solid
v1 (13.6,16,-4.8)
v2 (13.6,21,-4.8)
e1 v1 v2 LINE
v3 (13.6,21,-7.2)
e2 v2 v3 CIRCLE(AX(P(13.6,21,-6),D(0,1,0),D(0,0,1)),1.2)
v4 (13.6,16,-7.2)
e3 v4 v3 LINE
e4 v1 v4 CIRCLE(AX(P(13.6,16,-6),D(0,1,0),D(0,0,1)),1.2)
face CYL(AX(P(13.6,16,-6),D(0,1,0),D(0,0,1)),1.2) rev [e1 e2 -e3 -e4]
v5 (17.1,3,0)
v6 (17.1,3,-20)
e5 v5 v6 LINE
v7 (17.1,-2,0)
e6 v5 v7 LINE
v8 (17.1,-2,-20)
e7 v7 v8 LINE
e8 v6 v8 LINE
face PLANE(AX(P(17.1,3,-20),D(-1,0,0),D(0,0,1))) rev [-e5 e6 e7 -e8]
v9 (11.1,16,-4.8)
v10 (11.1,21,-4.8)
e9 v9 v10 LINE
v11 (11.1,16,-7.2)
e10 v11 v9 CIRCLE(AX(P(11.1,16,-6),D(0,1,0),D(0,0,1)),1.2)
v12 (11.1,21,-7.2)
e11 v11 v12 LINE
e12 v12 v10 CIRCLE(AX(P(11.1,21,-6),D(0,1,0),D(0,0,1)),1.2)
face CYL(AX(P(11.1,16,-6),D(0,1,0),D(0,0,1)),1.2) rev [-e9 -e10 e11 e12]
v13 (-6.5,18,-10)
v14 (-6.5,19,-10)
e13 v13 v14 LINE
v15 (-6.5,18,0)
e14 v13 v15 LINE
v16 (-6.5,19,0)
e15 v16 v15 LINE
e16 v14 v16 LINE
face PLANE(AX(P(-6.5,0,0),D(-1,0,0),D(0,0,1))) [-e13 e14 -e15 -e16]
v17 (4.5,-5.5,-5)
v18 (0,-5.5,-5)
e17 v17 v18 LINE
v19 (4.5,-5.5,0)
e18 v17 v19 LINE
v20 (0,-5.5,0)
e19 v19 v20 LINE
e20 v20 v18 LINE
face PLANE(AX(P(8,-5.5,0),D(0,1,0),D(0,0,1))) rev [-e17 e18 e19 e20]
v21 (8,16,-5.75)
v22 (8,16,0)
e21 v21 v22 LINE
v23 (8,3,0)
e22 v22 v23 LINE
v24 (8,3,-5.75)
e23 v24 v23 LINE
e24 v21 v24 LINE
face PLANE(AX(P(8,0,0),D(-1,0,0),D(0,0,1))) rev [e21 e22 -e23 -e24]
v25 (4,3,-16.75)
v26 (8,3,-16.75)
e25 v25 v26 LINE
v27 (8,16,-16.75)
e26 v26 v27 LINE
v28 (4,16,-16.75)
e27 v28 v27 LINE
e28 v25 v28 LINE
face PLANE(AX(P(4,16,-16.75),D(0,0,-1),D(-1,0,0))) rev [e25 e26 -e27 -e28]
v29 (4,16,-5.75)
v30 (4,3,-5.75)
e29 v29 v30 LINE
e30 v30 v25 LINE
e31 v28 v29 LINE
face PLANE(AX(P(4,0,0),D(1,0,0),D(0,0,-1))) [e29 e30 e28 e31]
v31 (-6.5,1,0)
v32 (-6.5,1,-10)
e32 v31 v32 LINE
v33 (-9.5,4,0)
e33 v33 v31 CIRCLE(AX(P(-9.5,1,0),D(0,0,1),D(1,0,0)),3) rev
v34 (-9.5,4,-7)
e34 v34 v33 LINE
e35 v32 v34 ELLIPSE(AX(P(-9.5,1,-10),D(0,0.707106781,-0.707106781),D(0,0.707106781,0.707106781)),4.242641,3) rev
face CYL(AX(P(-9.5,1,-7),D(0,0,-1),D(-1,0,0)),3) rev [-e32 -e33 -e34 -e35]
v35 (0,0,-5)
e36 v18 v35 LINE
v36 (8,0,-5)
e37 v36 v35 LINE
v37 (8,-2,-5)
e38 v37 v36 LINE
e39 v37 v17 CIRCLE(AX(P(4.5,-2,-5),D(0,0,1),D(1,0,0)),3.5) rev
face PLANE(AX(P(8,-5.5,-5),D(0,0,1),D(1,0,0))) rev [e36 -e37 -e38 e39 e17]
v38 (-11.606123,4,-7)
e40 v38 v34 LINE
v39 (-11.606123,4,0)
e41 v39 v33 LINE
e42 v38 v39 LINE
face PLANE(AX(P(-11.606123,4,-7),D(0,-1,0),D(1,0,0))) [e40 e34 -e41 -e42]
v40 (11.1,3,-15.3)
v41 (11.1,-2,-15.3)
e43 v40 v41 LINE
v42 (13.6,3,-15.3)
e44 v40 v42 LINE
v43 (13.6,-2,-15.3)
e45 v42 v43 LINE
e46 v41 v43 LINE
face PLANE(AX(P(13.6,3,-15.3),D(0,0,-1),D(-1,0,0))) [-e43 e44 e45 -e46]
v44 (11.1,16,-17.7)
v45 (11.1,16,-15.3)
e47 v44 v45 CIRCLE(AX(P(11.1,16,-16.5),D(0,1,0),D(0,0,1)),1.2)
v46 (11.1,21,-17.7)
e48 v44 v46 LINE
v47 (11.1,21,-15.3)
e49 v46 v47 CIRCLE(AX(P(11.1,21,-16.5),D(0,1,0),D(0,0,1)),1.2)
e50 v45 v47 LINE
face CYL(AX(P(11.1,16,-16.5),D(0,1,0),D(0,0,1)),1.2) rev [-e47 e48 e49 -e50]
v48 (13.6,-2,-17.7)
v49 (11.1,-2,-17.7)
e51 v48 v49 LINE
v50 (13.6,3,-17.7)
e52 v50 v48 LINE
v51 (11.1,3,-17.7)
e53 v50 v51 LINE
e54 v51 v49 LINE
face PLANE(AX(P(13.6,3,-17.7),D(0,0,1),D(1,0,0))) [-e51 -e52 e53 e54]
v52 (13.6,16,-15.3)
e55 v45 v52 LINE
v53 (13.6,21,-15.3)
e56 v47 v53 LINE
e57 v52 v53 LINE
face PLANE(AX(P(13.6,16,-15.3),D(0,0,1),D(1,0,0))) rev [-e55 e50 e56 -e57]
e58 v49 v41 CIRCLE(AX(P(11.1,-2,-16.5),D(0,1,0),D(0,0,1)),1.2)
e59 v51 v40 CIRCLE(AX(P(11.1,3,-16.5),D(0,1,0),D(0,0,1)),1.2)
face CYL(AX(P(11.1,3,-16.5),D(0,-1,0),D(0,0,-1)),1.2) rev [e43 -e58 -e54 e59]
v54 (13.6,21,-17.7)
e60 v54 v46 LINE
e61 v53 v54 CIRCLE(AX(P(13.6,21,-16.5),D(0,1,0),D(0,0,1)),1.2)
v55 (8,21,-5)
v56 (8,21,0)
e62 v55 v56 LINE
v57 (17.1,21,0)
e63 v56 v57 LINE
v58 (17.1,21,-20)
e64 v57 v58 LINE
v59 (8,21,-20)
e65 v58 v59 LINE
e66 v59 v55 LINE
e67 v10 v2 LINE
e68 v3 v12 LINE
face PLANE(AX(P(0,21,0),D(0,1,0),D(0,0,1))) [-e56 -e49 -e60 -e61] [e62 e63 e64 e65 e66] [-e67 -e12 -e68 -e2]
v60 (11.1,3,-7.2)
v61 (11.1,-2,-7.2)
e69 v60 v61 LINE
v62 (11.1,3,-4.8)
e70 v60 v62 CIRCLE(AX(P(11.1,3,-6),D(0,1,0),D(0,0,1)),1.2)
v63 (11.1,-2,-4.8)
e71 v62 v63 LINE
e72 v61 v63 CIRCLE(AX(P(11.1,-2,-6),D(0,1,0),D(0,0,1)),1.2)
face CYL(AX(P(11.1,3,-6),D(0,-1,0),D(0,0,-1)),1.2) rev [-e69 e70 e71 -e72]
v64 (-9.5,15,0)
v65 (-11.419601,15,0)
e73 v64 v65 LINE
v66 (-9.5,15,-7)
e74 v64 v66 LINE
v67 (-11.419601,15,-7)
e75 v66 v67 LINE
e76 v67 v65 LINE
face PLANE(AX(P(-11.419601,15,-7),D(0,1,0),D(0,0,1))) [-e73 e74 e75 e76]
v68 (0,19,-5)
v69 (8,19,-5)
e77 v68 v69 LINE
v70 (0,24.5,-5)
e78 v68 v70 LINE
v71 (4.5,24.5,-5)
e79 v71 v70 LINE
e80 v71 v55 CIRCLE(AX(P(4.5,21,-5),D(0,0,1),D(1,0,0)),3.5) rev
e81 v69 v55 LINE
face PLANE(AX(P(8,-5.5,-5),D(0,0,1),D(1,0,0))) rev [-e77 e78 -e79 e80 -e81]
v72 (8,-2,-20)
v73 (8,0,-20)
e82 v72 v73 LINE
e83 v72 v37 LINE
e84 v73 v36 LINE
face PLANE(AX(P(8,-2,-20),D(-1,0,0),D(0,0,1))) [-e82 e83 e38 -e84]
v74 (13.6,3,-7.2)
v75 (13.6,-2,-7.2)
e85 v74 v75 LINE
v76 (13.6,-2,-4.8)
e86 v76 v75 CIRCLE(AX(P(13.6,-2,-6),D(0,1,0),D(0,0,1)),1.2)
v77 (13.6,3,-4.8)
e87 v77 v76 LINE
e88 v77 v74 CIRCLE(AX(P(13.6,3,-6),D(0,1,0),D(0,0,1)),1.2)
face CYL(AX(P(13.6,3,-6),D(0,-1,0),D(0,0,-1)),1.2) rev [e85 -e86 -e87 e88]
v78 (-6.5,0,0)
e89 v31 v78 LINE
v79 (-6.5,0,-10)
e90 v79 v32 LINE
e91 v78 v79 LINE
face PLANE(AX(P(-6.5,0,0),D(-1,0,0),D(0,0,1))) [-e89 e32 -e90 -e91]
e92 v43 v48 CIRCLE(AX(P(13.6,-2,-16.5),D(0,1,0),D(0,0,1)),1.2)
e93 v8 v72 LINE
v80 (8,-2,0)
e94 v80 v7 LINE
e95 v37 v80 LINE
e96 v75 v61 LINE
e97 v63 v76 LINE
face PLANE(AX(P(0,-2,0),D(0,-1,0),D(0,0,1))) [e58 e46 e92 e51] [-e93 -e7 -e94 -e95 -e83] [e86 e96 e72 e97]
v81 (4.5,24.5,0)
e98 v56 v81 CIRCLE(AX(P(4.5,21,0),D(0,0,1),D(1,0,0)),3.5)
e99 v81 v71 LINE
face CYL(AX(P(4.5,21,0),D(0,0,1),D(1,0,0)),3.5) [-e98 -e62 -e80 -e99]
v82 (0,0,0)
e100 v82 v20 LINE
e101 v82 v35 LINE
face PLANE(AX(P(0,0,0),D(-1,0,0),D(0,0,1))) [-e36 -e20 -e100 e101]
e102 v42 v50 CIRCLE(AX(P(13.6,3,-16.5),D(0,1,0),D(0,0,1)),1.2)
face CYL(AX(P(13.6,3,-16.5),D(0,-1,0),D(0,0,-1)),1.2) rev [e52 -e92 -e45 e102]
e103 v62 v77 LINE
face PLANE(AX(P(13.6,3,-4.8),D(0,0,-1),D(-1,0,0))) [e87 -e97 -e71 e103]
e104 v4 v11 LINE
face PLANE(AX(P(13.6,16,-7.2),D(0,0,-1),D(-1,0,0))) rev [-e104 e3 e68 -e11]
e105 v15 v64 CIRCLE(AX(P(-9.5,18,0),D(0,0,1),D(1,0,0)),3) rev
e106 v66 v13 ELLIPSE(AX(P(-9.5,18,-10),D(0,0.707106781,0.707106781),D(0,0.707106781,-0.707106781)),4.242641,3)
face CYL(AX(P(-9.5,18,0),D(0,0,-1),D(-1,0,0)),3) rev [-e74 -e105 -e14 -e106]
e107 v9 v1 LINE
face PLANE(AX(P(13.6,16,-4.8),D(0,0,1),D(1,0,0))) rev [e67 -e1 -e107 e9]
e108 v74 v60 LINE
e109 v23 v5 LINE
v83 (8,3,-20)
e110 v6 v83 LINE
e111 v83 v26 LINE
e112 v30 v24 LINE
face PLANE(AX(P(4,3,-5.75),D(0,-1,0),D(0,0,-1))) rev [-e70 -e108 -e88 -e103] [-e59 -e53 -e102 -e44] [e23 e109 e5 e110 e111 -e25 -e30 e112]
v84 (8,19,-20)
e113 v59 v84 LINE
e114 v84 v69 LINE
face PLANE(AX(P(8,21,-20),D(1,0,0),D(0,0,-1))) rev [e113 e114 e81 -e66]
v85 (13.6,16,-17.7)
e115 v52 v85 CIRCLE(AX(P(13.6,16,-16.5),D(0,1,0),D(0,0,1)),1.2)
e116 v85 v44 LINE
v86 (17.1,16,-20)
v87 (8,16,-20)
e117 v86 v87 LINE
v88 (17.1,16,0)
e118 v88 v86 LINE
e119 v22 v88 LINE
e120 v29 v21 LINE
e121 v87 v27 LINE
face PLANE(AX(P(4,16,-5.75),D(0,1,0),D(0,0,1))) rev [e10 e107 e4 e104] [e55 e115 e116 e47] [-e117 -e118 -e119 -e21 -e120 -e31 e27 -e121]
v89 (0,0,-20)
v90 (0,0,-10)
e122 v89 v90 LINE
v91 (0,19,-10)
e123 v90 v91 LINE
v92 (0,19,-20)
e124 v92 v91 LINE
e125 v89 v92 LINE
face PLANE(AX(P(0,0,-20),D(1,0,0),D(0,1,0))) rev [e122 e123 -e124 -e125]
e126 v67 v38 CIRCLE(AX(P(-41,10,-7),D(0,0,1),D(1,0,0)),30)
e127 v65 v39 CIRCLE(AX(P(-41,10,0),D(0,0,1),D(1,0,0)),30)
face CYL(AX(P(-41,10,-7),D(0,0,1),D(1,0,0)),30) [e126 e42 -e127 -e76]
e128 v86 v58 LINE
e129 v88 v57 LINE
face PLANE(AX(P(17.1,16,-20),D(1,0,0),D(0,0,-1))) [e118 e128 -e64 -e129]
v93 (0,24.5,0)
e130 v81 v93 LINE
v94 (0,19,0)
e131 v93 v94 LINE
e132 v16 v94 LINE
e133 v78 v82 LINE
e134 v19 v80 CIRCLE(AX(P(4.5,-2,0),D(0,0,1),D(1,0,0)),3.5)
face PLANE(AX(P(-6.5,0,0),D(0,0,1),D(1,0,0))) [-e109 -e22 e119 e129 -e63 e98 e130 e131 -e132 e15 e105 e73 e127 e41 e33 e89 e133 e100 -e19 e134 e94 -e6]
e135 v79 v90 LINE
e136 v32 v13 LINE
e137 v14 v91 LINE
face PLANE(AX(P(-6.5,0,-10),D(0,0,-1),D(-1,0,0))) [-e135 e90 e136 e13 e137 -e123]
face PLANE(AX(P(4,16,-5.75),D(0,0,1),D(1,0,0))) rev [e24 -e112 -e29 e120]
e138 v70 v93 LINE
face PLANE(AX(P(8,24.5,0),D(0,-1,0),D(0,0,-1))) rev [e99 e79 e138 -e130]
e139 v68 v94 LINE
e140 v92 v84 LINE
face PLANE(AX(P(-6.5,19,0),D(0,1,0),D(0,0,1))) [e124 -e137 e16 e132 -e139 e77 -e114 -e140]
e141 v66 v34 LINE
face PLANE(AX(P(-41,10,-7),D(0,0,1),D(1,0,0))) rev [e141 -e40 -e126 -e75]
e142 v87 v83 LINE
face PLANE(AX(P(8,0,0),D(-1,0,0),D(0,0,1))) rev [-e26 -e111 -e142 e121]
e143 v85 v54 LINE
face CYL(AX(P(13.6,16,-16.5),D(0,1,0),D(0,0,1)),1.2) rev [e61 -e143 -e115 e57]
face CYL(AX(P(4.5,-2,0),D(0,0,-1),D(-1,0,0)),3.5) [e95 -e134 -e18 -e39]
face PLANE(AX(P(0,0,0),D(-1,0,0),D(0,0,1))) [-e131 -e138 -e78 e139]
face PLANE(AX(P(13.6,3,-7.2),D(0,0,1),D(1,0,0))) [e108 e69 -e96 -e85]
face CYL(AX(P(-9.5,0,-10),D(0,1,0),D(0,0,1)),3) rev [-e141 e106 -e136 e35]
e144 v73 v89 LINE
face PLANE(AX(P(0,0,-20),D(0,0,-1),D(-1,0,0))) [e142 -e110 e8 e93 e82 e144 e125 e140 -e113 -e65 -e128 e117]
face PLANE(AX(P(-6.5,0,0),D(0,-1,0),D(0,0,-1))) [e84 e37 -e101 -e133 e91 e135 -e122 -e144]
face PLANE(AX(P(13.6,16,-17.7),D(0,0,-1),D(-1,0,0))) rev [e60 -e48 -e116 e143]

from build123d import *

# Parameters (mm, degrees)
SKETCH_1_W          = 10
SKETCH_1_H          = 19
EXTRUDE_1_DEPTH     = 6.5
EXTRUDE_2_DEPTH     = 7
FILLET_1_R          = 3
SKETCH_3_W          = 5
SKETCH_3_H          = 30
EXTRUDE_3_DEPTH     = 8
SKETCH_4_W          = 8
SKETCH_4_H          = 19
EXTRUDE_4_DEPTH     = 15
SKETCH_6_W          = 11
SKETCH_6_H          = 13
CUT_EXTRUDE_1_DEPTH = 4
SKETCH_8_W          = 9.1
SKETCH_8_H          = 20
EXTRUDE_5_DEPTH     = 3
SKETCH_8_2_W        = 9.1
SKETCH_8_2_H        = 20
EXTRUDE_6_DEPTH     = 2
FILLET_2_R          = 3.5
FILLET_3_R          = 3


with BuildPart() as part:
    # 草圖1 → 填料-伸長1 (new body)
    with BuildSketch(Plane(origin=(0, 0, 0), x_dir=(0, 0, -1), z_dir=(1, 0, 0))):
        with Locations((5, 9.5)):
            Rectangle(SKETCH_1_W, SKETCH_1_H)
    extrude(amount=-EXTRUDE_1_DEPTH)

    # 草圖2 → 填料-伸長2 (add)
    with BuildSketch(Plane.XY):
        with BuildLine():
            Line((-11.419601085, 15), (-6.5, 15))
            Line((-6.5, 15), (-6.5, 4))
            Line((-6.5, 4), (-11.606123087, 4))
            ThreePointArc((-11.606123087, 4), (-70.995688063, 10.508623254), (-11.419601085, 15))
        make_face()
    extrude(amount=-EXTRUDE_2_DEPTH)

    # 圓角1
    fillet_1_edges = [part.edges().sort_by_distance(p)[0] for p in [
        (-6.5, 9.5, -7),
    ]]
    fillet(fillet_1_edges, radius=FILLET_1_R - 0.0001)  # a hair under: the kernel refuses the full size

    # 草圖3 → 填料-伸長3 (add)
    with BuildSketch(Plane(origin=(0, 0, 0), x_dir=(0, 0, -1), z_dir=(1, 0, 0))):
        with Locations((2.5, 9.5)):
            Rectangle(SKETCH_3_W, SKETCH_3_H)
    extrude(amount=EXTRUDE_3_DEPTH)

    # 草圖4 → 填料-伸長4 (add)
    with BuildSketch(Plane(origin=(0, 0, -5), x_dir=(-1, 0, 0), z_dir=(0, 0, -1))):
        with Locations((-4, 9.5)):
            Rectangle(SKETCH_4_W, SKETCH_4_H)
    extrude(amount=EXTRUDE_4_DEPTH)

    # 草圖6 → 除料-伸長1 (cut)
    with BuildSketch(Plane(origin=(8, 0, 0), x_dir=(0, 0, -1), z_dir=(1, 0, 0))):
        with Locations((11.25, 9.5)):
            Rectangle(SKETCH_6_W, SKETCH_6_H)
    extrude(amount=-CUT_EXTRUDE_1_DEPTH, mode=Mode.SUBTRACT)

    # 草圖8 → 填料-伸長5 (add)
    with BuildSketch(Plane(origin=(0, 19, 0), x_dir=(1, 0, 0), z_dir=(0, 1, 0))):
        with Locations((12.55, 10)):
            Rectangle(SKETCH_8_W, SKETCH_8_H)
        with BuildLine():
            Line((13.6, 15.3), (11.1, 15.3))
            ThreePointArc((11.1, 15.3), (9.9, 16.5), (11.1, 17.7))
            Line((11.1, 17.7), (13.6, 17.7))
            ThreePointArc((13.6, 17.7), (14.8, 16.5), (13.6, 15.3))
        make_face(mode=Mode.SUBTRACT)
        with BuildLine():
            Line((13.6, 4.8), (11.1, 4.8))
            ThreePointArc((11.1, 4.8), (9.9, 6), (11.1, 7.2))
            Line((11.1, 7.2), (13.6, 7.2))
            ThreePointArc((13.6, 7.2), (14.8, 6), (13.6, 4.8))
        make_face(mode=Mode.SUBTRACT)
    extrude_5 = extrude(amount=-EXTRUDE_5_DEPTH)

    # 鏡射1: 填料-伸長5 across plane
    add(extrude_5.mirror(Plane.ZX.offset(9.5)))

    # 草圖8<2> → 填料-伸長6 (add)
    with BuildSketch(Plane(origin=(0, 19, 0), x_dir=(1, 0, 0), z_dir=(0, 1, 0))):
        with Locations((12.55, 10)):
            Rectangle(SKETCH_8_2_W, SKETCH_8_2_H)
        with BuildLine():
            Line((13.6, 15.3), (11.1, 15.3))
            ThreePointArc((11.1, 15.3), (9.9, 16.5), (11.1, 17.7))
            Line((11.1, 17.7), (13.6, 17.7))
            ThreePointArc((13.6, 17.7), (14.8, 16.5), (13.6, 15.3))
        make_face(mode=Mode.SUBTRACT)
        with BuildLine():
            Line((13.6, 4.8), (11.1, 4.8))
            ThreePointArc((11.1, 4.8), (9.9, 6), (11.1, 7.2))
            Line((11.1, 7.2), (13.6, 7.2))
            ThreePointArc((13.6, 7.2), (14.8, 6), (13.6, 4.8))
        make_face(mode=Mode.SUBTRACT)
    extrude_6 = extrude(amount=EXTRUDE_6_DEPTH)

    # 鏡射2: 填料-伸長6 across plane
    add(extrude_6.mirror(Plane.ZX.offset(9.5)))

    # 圓角2
    fillet_2_edges = [part.edges().sort_by_distance(p)[0] for p in [
        (8, 24.5, -2.5),
        (8, -5.5, -2.5),
    ]]
    fillet(fillet_2_edges, radius=FILLET_2_R - 0.0001)  # a hair under: the kernel refuses the full size

    # 圓角3
    fillet_3_edges = [part.edges().sort_by_distance(p)[0] for p in [
        (-6.5, 4, -4.99995),
        (-6.5, 15, -4.99995),
    ]]
    fillet(fillet_3_edges, radius=FILLET_3_R - 0.0001)  # a hair under: the kernel refuses the full size


solid = part.part
